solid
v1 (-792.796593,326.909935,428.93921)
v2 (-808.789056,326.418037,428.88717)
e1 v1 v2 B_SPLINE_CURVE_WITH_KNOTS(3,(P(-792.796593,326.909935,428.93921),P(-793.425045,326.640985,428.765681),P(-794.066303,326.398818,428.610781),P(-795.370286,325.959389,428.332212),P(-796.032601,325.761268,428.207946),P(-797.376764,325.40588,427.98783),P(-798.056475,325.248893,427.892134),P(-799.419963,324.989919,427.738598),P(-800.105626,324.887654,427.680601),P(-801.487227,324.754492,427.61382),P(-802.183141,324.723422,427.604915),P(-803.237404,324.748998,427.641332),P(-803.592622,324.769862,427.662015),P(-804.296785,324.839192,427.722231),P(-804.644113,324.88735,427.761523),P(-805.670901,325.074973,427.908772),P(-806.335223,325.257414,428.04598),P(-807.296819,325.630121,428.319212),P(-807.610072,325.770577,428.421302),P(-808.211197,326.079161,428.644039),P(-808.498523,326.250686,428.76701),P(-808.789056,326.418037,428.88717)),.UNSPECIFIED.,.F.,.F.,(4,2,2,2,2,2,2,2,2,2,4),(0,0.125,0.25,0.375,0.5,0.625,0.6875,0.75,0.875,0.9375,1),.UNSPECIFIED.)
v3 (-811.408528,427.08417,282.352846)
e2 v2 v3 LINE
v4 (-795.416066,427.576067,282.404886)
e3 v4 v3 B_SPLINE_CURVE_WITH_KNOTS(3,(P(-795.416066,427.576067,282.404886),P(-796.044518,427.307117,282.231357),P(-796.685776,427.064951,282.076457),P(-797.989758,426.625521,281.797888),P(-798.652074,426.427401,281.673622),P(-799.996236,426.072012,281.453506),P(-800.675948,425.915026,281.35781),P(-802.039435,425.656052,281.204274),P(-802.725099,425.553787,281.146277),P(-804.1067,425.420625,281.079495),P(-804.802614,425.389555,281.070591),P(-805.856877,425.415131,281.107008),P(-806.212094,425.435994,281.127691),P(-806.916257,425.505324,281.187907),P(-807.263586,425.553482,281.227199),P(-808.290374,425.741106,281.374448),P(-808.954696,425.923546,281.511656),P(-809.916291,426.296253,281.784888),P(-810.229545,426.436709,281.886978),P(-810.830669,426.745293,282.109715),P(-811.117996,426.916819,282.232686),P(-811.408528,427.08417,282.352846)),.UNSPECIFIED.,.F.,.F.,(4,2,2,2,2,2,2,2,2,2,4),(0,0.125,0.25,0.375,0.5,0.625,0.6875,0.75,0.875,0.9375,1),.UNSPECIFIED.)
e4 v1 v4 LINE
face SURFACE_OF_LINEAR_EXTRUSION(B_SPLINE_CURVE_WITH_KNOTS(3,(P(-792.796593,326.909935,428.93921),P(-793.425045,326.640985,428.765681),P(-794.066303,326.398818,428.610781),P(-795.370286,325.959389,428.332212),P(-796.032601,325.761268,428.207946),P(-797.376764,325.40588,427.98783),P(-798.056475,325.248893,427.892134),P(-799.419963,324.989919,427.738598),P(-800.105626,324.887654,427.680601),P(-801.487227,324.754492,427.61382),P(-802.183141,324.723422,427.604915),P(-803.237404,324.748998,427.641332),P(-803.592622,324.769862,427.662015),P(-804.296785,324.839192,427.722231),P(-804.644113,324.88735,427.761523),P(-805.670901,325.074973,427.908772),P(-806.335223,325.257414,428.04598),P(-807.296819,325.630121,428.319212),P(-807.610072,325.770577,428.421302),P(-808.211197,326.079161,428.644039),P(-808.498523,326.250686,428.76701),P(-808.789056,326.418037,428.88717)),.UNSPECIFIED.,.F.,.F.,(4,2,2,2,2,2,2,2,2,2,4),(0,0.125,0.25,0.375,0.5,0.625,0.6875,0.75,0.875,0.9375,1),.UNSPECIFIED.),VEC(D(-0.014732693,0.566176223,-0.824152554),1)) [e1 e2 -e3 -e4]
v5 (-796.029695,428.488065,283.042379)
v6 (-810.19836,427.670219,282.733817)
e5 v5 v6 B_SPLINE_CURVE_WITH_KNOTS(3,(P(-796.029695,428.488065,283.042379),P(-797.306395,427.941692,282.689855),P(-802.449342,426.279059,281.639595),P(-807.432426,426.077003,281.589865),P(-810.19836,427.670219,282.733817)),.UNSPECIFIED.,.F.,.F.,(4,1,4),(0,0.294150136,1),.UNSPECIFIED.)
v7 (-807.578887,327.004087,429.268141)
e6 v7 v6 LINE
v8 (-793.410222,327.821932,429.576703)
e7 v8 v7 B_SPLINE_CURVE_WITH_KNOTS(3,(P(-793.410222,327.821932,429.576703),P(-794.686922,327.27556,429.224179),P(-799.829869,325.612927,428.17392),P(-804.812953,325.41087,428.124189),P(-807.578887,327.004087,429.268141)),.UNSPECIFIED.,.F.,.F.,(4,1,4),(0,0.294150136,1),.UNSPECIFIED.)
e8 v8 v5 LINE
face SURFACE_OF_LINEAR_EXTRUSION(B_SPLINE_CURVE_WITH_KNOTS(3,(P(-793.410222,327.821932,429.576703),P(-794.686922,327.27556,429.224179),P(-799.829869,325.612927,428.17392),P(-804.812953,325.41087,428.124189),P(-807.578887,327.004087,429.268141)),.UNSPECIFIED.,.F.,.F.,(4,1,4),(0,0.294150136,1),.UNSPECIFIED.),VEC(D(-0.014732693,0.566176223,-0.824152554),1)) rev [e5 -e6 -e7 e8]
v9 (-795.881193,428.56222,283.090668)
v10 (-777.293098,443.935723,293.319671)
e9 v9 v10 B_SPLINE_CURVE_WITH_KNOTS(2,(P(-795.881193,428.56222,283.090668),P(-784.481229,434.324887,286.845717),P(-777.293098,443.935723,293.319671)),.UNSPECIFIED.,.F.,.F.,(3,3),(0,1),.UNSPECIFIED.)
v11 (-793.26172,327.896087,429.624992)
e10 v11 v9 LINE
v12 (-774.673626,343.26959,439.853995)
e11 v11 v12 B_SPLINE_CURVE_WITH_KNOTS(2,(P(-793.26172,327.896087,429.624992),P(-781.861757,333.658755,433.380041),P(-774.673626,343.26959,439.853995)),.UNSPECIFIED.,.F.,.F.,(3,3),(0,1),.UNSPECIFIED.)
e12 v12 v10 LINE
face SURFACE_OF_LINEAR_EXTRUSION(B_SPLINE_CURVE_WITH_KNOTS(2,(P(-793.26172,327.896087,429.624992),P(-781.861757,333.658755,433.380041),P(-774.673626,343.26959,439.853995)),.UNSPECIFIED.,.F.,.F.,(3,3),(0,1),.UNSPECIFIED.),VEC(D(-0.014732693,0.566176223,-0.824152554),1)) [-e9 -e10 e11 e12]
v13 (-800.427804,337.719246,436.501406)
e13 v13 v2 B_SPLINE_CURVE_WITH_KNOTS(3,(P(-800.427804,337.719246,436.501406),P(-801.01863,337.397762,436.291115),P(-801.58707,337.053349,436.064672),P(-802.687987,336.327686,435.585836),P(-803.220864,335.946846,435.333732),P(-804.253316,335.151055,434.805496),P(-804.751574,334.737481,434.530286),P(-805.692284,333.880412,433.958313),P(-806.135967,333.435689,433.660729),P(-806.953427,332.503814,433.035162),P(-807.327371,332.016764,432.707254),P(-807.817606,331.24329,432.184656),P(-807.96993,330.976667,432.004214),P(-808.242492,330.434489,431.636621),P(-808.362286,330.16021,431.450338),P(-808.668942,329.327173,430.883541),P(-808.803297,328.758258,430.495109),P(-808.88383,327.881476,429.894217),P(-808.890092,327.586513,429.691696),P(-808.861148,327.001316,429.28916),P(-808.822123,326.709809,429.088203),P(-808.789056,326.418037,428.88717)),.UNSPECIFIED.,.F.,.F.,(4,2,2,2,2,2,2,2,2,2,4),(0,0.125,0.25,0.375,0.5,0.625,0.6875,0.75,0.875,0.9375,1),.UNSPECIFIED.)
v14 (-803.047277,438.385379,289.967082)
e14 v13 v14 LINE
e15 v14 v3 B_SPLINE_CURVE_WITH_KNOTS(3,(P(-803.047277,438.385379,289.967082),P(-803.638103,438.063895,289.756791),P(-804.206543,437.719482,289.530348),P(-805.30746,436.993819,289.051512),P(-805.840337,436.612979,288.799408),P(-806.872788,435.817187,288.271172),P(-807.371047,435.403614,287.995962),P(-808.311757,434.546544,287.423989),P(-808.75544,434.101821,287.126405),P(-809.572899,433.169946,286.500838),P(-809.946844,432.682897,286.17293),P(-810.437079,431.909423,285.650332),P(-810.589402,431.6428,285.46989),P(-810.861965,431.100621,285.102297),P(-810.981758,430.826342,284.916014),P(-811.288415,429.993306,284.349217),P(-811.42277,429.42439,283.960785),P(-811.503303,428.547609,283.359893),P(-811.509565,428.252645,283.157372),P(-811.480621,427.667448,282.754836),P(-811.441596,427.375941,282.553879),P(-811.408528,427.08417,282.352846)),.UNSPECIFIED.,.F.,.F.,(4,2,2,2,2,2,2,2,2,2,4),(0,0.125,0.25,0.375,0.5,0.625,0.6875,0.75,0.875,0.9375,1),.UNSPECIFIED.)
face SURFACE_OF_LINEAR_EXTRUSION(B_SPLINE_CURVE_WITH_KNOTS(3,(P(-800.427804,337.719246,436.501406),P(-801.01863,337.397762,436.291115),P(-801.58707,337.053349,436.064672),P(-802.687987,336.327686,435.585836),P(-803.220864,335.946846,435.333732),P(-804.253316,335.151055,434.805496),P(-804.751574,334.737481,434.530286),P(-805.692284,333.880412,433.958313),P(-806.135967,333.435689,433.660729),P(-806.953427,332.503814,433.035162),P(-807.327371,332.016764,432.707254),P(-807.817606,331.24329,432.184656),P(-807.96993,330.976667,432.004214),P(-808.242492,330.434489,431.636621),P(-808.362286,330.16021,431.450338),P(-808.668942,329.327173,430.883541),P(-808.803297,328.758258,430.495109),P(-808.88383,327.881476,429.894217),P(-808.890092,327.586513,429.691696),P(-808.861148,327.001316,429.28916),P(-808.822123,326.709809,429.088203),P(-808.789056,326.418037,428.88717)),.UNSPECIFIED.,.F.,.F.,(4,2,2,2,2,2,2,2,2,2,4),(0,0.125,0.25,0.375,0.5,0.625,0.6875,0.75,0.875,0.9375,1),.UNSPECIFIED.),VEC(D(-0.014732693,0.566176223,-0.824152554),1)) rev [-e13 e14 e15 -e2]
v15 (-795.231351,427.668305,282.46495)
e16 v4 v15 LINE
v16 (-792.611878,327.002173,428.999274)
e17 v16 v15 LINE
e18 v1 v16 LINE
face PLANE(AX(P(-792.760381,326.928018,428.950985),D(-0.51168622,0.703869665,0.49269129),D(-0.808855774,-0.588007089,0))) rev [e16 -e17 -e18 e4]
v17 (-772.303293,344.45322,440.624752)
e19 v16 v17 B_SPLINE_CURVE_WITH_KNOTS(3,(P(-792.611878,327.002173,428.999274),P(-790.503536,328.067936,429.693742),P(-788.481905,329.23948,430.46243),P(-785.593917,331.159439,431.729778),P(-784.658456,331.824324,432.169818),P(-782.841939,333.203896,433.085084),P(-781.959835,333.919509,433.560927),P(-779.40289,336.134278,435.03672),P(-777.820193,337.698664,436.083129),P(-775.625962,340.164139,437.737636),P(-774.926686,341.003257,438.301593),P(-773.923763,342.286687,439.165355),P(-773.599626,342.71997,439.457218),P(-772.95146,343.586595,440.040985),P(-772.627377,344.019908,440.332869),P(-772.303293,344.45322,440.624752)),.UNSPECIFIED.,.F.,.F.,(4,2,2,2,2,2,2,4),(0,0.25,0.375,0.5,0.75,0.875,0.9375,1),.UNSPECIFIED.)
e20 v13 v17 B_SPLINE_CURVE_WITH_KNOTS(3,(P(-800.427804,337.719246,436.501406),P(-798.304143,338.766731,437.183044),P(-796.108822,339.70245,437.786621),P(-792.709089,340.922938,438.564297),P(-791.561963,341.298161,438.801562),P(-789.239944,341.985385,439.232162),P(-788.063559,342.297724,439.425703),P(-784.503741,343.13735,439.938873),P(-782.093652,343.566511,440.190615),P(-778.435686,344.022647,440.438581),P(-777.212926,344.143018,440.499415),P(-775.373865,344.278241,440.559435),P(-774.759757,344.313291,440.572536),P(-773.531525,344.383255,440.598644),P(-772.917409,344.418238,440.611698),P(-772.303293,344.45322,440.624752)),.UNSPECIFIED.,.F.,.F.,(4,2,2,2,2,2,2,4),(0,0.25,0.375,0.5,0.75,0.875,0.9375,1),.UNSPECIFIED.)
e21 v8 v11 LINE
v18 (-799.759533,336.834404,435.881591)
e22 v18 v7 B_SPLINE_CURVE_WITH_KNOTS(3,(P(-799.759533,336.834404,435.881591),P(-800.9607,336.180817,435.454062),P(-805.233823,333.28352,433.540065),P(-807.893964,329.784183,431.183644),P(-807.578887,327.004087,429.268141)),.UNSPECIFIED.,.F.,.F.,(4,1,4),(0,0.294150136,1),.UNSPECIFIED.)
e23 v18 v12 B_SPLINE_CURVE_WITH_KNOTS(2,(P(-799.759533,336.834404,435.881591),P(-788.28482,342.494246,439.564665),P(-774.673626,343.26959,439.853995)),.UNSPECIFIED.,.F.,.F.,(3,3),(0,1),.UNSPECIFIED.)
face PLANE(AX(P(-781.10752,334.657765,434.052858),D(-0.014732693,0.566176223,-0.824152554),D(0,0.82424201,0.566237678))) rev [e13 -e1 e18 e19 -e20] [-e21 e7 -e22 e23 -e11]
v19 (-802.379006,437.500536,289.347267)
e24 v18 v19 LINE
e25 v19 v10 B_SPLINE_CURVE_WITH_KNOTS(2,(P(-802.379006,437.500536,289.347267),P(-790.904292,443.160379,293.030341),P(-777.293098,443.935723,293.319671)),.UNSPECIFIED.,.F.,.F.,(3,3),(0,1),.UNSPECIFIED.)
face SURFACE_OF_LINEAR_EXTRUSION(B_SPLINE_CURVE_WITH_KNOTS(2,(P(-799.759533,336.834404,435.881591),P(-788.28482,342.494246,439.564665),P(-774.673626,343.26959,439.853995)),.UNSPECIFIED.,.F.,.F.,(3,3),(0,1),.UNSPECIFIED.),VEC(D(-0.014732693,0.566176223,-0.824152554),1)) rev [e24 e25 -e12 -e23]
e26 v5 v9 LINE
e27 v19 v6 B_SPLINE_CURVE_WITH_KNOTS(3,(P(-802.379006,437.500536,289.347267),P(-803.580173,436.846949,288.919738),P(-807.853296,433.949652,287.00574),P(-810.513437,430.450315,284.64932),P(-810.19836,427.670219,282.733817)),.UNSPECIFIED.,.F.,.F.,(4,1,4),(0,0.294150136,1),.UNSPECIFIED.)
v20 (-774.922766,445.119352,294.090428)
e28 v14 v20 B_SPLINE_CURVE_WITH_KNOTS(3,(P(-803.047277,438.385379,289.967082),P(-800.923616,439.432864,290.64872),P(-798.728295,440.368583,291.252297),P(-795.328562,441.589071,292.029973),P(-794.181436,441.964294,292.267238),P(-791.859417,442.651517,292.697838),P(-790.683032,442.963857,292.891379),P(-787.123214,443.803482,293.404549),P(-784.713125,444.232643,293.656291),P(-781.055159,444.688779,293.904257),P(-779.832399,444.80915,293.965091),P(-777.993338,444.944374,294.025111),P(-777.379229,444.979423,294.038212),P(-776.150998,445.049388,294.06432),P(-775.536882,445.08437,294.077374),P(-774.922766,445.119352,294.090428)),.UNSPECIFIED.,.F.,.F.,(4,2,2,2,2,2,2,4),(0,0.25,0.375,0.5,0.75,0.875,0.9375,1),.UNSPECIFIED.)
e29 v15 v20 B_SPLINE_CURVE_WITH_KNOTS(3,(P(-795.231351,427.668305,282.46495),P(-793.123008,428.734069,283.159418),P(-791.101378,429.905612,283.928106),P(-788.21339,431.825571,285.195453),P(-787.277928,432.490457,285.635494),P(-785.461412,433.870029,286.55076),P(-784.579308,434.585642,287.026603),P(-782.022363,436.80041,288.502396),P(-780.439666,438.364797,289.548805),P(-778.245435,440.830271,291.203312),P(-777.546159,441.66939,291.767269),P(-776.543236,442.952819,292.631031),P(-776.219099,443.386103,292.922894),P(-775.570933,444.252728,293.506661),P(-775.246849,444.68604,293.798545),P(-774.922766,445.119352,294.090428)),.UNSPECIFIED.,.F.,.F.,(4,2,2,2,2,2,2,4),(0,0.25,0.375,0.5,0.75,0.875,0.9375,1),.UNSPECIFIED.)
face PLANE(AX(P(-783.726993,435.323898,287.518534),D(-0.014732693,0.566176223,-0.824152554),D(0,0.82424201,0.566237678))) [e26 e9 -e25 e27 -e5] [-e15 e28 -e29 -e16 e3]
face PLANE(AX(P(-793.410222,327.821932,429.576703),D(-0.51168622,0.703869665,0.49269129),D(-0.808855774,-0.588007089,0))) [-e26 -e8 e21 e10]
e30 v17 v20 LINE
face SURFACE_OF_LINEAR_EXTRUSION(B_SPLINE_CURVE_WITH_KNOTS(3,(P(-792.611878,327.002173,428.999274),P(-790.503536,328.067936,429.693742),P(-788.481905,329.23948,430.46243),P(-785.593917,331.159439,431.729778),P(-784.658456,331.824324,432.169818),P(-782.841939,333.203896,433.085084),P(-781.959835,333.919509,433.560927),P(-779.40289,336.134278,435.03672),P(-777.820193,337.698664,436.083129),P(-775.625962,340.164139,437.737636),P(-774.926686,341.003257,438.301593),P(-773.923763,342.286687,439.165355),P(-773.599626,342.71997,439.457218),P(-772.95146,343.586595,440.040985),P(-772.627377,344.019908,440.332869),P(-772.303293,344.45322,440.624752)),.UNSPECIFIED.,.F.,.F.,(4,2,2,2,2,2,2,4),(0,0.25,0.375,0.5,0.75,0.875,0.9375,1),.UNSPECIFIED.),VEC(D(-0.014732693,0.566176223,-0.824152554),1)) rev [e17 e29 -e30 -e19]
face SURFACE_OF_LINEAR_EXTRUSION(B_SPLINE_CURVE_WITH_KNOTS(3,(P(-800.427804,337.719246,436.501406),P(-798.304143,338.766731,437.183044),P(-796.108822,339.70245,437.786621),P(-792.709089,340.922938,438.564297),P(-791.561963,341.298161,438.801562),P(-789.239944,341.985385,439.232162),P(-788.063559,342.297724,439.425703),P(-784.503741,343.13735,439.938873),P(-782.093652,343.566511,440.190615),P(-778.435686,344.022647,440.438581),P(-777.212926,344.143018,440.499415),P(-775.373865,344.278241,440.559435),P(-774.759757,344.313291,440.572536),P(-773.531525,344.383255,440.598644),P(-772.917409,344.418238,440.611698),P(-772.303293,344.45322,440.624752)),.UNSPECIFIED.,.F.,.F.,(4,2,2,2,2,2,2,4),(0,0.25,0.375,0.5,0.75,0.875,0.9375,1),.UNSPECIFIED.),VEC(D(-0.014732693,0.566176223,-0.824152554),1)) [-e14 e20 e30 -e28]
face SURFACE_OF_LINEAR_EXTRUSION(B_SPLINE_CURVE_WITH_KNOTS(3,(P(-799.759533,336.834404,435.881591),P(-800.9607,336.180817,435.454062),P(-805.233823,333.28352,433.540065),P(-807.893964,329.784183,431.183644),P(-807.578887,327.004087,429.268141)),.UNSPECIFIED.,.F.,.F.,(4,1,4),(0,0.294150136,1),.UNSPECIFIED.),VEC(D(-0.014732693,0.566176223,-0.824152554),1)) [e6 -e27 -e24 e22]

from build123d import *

# Parameters (mm, degrees)
BOSS_EXTRUDE1_DEPTH      = 91.359952
BOSS_EXTRUDE1_DEPTH_BACK = 91.359952
SKETCH1_R                = 6.35
SKETCH2_R                = 5.1943
CUT_EXTRUDE1_DEPTH       = 1020.644650611
EXTRUDE_THIN2_START      = -177.8
EXTRUDE_THIN2_DEPTH      = 177.8


# Read off the part's stored shape, not the designer's step: Extrude-Thin2
with BuildPart() as part:
    # Sketch1 → Boss-Extrude1 (new, two sides: drawn at the far end of the back side and taken through both)
    with BuildSketch(Plane(origin=(-797.858372093, 381.268468163, 361.489360836), x_dir=(0.9998902886126457, 0.009608155882865862, -0.011273600962007019), z_dir=(-0.014732692778449213, 0.5661762234602228, -0.8241525536888277)).offset(-BOSS_EXTRUDE1_DEPTH_BACK)):
        with Locations(Location((0, 0, 0), (0, 0, 90.088001086))):
            Circle(SKETCH1_R)
    extrude(amount=BOSS_EXTRUDE1_DEPTH + BOSS_EXTRUDE1_DEPTH_BACK)

    # Sketch2 → Cut-Extrude1 (cut, through all)
    with BuildSketch(Plane(origin=(-0.310230962, 11.922151452, -17.354440468), x_dir=(0.999890288612646, 0.009608155882749703, -0.011273600962086832), z_dir=(-0.014732692778449222, 0.5661762234602224, -0.8241525536888279))):
        with Locations(Location((-798.182837875, -520.172934132, 0), (0, 0, 270.088001086))):
            Circle(SKETCH2_R)
    extrude(amount=-CUT_EXTRUDE1_DEPTH, mode=Mode.SUBTRACT)


with BuildPart() as body_2:
    # Extrude-Thin2 outline → Extrude-Thin2 (new body)
    with BuildSketch(Plane(origin=(-0.310230962, 11.922151452, -17.354440468), x_dir=(-0.9998914679921496, -0.00834220575504257, 0.012143304313270938), z_dir=(-0.014732692778449226, 0.5661762234602217, -0.8241525536888284)).offset(EXTRUDE_THIN2_START)):
        with BuildLine():
            add(Edge.make_bspline(
                [(795.007403943, 512.444480964), (792.898832326, 513.716162183), (790.876982299, 515.117057901), (787.988681037, 517.417188527), (787.053117975, 518.21438231), (785.23640397, 519.869741584), (784.354204701, 520.729019996), (781.796982108, 523.3901752), (780.214112798, 525.272124548), (778.019643962, 528.241116236), (777.320291883, 529.252086912), (776.31726013, 530.799037937), (775.993088295, 531.321432242), (775.34485148, 532.366291694), (775.020733072, 532.88872142), (774.696614665, 533.411151146)],
                knots=[0, 0, 0, 0, 0.25, 0.25, 0.375, 0.375, 0.5, 0.5, 0.75, 0.75, 0.875, 0.875, 0.9375, 0.9375, 1, 1, 1, 1], degree=3))
            Line((795.007403943, 512.444480964), (795.192139039, 512.334444488))
            add(Edge.make_bspline(
                [(795.192139039, 512.334444488), (795.820659251, 512.014505469), (796.461986169, 511.727191335), (797.766110641, 511.207259179), (798.428497889, 510.973595907), (799.772806417, 510.556032006), (800.452591935, 510.372450513), (801.816227189, 510.07205513), (802.501964688, 509.954924004), (803.88371636, 509.807351912), (804.579705649, 509.776701036), (805.634083311, 509.818402312), (805.989339161, 509.847310141), (806.693578465, 509.938551358), (807.040945003, 510.000493885), (808.067844122, 510.238519077), (808.732238224, 510.466586402), (809.693938159, 510.928501806), (810.007225559, 511.10207874), (810.608415369, 511.482548524), (810.895772864, 511.693557881), (811.186337014, 511.899534791)],
                knots=[0, 0, 0, 0, 0.125, 0.125, 0.25, 0.25, 0.375, 0.375, 0.5, 0.5, 0.625, 0.625, 0.6875, 0.6875, 0.75, 0.75, 0.875, 0.875, 0.9375, 0.9375, 1, 1, 1, 1], degree=3))
            add(Edge.make_bspline(
                [(802.824178055, 525.525933285), (803.415067853, 525.141877964), (803.983569629, 524.729777367), (805.084606371, 523.860520869), (805.61754116, 523.403865824), (806.650104746, 522.448833612), (807.148417232, 521.952115017), (808.08922944, 520.921809356), (808.532960793, 520.386746599), (809.350508798, 519.264437037), (809.724494326, 518.677316278), (810.21478219, 517.743872092), (810.367122157, 517.421936823), (810.63971425, 516.766905357), (810.759520718, 516.435352914), (811.066210954, 515.427787282), (811.200580221, 514.738918347), (811.281121537, 513.675990605), (811.287384359, 513.318194206), (811.258437226, 512.607919011), (811.219408013, 512.253857446), (811.186337014, 511.899534791)],
                knots=[0, 0, 0, 0, 0.125, 0.125, 0.25, 0.25, 0.375, 0.375, 0.5, 0.5, 0.625, 0.625, 0.6875, 0.6875, 0.75, 0.75, 0.875, 0.875, 0.9375, 0.9375, 1, 1, 1, 1], degree=3))
            add(Edge.make_bspline(
                [(802.824178055, 525.525933285), (800.700286301, 526.77528344), (798.504727379, 527.888310329), (795.104625441, 529.334637361), (793.957375, 529.778259938), (791.635103666, 530.588520593), (790.458590691, 530.95555421), (786.898386756, 531.938184836), (784.488036247, 532.434463461), (780.829672903, 532.950837392), (779.606779988, 533.084498644), (777.76751946, 533.229941481), (777.153344334, 533.266248665), (775.9249795, 533.338699906), (775.310797082, 533.374925526), (774.696614665, 533.411151146)],
                knots=[0, 0, 0, 0, 0.25, 0.25, 0.375, 0.375, 0.5, 0.5, 0.75, 0.75, 0.875, 0.875, 0.9375, 0.9375, 1, 1, 1, 1], degree=3))
        make_face()
        with BuildLine():
            Line((795.805834227, 513.447123796), (795.657315978, 513.5355879))
            add(Edge.make_bspline(
                [(795.657315978, 513.5355879), (784.256115309, 520.41167093), (777.067204021, 531.999122223)],
                knots=[0, 0, 0, 1, 1, 1], degree=2))
            add(Edge.make_bspline(
                [(802.155834227, 524.445646424), (790.679875453, 531.196221565), (777.067204021, 531.999122223)],
                knots=[0, 0, 0, 1, 1, 1], degree=2))
            add(Edge.make_bspline(
                [(802.155834227, 524.445646424), (803.357131939, 523.664849768), (807.630718362, 520.192997769), (810.29114838, 515.974403166), (809.976037151, 512.598301742)],
                knots=[0, 0, 0, 0, 0.294150136, 1, 1, 1, 1], degree=3))
            add(Edge.make_bspline(
                [(795.805834227, 513.447123796), (797.082672823, 512.797167788), (802.226178064, 510.832059381), (807.209803167, 510.637356701), (809.976037151, 512.598301742)],
                knots=[0, 0, 0, 0, 0.294150136, 1, 1, 1, 1], degree=3))
        make_face(mode=Mode.SUBTRACT)
    extrude(amount=EXTRUDE_THIN2_DEPTH)


solid = body_2.part
